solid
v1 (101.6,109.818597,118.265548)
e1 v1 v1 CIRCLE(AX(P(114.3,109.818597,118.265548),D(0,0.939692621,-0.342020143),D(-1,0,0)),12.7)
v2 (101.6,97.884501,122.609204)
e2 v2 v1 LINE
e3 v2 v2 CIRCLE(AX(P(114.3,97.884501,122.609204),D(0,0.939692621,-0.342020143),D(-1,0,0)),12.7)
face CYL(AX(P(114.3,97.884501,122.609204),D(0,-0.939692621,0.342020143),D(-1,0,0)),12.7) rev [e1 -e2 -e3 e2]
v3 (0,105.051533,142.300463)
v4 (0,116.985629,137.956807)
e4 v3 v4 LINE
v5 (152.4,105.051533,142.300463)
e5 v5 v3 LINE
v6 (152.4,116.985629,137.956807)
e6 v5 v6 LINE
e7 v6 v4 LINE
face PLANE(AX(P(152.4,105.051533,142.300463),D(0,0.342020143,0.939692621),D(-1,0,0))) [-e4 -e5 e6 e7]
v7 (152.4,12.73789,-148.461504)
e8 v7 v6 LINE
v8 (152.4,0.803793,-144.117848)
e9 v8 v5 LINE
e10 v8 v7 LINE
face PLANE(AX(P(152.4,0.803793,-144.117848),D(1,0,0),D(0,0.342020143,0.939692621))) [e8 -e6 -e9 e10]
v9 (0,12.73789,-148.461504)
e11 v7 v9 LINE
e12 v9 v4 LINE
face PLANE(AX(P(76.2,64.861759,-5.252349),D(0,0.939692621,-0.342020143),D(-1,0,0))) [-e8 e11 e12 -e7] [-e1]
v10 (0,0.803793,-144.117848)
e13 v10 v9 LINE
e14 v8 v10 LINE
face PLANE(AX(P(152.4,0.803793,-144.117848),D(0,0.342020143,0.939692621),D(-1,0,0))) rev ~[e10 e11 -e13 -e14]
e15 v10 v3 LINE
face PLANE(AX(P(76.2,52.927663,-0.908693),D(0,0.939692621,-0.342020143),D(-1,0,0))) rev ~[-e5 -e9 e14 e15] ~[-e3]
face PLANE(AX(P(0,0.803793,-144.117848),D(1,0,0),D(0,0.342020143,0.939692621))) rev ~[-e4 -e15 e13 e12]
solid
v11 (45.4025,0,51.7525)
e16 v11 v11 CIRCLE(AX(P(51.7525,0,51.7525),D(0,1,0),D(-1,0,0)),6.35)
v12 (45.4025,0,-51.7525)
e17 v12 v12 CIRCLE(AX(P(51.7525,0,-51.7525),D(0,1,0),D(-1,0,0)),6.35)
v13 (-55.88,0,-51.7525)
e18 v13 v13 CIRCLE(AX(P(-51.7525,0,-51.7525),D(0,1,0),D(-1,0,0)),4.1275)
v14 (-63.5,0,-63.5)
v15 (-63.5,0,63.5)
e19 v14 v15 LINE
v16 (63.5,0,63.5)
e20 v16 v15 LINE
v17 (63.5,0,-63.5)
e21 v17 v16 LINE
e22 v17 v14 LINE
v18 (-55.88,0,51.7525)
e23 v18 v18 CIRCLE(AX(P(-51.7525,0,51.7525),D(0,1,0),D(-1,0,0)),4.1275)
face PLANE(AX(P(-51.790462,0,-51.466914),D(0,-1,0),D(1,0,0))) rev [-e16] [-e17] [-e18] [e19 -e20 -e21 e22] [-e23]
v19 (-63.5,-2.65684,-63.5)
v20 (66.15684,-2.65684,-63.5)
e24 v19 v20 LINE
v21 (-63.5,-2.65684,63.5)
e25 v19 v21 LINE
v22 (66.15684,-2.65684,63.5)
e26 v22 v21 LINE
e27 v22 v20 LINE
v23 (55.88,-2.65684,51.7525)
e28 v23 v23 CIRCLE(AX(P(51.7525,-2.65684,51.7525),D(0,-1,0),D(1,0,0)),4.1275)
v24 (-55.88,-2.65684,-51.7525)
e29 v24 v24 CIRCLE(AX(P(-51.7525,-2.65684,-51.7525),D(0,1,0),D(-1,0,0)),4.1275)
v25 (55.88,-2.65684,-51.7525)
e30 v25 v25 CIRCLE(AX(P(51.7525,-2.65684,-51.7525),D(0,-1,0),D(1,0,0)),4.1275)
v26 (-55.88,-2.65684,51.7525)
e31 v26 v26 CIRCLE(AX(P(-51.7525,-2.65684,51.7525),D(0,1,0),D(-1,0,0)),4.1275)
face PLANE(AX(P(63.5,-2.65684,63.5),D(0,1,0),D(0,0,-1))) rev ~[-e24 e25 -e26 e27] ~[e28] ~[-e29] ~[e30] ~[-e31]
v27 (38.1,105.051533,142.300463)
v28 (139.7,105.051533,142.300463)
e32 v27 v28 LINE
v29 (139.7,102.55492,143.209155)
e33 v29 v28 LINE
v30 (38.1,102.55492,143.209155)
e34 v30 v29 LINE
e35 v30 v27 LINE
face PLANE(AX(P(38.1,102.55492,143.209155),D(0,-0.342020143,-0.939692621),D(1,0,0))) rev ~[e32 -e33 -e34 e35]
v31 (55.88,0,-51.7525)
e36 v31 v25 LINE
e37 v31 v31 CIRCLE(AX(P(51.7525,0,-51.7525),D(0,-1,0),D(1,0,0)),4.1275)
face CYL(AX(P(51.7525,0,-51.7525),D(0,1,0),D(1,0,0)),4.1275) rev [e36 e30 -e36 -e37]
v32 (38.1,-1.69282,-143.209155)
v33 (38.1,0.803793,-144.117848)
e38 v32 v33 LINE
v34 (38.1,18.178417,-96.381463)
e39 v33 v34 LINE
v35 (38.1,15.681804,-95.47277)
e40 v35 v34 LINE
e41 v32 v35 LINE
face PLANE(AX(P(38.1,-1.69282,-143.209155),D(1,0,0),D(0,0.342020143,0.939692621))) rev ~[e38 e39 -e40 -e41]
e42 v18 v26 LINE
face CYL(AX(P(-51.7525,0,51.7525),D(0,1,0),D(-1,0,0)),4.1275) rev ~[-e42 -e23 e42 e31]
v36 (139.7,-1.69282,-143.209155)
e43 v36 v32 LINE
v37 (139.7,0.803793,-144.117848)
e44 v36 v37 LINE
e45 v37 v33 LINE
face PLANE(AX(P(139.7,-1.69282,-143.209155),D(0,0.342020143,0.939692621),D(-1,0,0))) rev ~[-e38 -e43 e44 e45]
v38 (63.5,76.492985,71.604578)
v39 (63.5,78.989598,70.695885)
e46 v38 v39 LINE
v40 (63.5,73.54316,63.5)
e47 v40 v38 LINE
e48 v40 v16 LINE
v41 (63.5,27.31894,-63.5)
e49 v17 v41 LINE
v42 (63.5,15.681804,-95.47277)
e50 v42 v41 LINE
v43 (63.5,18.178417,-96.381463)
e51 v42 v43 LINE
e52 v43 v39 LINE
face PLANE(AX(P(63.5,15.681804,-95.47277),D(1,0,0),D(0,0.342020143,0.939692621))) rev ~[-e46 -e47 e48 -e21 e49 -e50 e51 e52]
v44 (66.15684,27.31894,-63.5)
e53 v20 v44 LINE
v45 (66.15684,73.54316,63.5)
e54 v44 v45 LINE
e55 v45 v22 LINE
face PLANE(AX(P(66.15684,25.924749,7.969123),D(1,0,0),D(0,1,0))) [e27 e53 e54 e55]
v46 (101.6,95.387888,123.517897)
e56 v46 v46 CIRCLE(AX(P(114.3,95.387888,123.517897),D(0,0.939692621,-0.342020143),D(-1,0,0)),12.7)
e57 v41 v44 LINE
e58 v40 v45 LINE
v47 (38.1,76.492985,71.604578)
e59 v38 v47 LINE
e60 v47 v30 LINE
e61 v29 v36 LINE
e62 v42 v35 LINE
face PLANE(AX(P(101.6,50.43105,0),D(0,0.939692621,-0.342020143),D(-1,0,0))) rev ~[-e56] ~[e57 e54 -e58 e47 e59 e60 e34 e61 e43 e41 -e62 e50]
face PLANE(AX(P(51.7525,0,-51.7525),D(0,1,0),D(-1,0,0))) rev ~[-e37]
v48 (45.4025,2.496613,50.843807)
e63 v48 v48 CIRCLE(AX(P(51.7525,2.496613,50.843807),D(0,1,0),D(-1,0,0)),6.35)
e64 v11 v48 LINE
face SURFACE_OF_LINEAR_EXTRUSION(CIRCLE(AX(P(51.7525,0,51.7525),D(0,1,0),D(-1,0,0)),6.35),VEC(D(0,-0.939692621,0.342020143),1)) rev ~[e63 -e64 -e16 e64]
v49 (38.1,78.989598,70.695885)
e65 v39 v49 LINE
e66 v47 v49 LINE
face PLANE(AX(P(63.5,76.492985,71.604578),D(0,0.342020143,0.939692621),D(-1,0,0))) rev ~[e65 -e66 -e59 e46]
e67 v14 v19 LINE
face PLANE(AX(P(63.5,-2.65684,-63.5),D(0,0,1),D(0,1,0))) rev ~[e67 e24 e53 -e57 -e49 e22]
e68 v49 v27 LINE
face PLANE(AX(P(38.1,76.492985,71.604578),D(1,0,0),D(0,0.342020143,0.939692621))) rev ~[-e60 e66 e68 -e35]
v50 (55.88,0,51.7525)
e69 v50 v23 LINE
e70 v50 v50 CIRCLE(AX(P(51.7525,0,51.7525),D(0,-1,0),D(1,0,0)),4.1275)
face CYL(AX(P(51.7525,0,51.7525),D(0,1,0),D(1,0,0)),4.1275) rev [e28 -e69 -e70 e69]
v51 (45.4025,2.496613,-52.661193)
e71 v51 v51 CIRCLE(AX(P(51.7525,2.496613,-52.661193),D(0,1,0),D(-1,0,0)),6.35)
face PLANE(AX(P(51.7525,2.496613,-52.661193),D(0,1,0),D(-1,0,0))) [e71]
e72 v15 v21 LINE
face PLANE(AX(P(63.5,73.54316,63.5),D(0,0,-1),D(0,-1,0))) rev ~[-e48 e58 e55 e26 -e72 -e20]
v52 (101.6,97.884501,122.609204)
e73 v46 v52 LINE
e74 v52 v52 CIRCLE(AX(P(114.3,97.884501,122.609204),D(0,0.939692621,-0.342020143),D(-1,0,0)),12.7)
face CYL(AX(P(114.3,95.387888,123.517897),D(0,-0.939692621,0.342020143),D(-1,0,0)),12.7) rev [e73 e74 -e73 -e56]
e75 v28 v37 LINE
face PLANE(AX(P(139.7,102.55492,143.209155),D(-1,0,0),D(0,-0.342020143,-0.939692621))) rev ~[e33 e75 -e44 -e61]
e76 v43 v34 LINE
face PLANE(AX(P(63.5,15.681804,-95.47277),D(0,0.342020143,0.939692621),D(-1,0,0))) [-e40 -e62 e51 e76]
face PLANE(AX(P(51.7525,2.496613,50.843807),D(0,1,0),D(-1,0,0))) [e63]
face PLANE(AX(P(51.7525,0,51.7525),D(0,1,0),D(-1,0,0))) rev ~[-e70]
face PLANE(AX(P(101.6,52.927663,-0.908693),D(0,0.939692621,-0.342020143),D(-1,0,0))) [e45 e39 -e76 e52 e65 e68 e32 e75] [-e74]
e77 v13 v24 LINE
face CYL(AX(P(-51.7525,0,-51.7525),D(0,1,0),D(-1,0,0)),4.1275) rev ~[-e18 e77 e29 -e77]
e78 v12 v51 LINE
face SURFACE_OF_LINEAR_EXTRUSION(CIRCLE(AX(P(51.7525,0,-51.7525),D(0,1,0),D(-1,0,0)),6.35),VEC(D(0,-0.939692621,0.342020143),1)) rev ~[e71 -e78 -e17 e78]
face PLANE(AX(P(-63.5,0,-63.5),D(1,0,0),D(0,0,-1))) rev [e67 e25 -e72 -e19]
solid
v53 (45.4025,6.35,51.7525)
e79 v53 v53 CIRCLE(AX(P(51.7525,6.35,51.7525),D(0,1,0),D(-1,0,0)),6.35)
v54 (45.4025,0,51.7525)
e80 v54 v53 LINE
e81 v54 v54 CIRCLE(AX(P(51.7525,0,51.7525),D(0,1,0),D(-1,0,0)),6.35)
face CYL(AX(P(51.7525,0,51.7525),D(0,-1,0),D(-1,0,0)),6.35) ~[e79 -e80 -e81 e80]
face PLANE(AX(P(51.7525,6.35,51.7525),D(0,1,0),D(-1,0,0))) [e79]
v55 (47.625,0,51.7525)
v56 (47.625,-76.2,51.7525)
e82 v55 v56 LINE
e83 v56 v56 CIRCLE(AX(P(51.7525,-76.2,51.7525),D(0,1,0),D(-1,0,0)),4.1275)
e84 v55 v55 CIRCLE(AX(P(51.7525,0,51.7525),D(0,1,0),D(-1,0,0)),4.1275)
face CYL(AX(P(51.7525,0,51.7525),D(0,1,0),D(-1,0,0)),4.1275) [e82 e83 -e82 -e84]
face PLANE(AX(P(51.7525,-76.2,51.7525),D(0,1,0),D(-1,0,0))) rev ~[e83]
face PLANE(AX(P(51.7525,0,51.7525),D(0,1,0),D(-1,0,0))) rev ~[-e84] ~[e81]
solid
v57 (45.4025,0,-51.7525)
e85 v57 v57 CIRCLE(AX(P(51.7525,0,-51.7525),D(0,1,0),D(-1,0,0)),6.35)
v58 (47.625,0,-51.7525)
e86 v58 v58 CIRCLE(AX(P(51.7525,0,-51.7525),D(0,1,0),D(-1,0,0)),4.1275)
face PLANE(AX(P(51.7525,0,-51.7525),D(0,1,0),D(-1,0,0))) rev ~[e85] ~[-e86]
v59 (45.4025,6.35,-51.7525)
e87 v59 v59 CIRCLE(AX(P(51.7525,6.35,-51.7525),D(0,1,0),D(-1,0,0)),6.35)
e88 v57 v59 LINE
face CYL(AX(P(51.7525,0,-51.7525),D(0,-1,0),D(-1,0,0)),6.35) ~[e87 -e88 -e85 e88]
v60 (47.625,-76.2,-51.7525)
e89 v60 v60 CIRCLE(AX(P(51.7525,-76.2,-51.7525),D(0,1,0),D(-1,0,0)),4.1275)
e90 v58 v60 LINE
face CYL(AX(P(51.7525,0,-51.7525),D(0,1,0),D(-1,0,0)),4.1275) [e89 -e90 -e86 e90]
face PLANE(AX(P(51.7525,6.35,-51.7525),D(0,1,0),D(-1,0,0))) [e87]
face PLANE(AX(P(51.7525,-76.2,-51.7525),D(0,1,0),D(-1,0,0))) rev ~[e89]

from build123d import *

# Parameters (mm, degrees)
F0_R      = 4.1275
F1_DEPTH  = 2.65684
F4_DEPTH  = 2.65684
F5_R      = 6.35
F5_R_2    = 4.1275
F6_DEPTH  = 6.35
F7_DEPTH  = 76.2
F8_R      = 12.7
F8_W      = 25.4
F8_H      = 76.2
F8_H_2    = 50.8
F9_DEPTH  = 2.65684
F10_W     = 152.4
F10_H     = 304.8
F10_R     = 12.7
F11_DEPTH = 12.7


with BuildPart() as f1:
    # F0 (on Front) → F1 (new body)
    with BuildSketch(Plane.XZ):
        with BuildLine():
            Line((47.625, -47.625), (46.9269177812, -47.625))
            ThreePointArc((46.9269177812, -47.625), (49.5524939874, -57.7092166749), (58.1025, -51.7525))
            ThreePointArc((58.1025, -51.7525), (54.4088955842, -45.9848260754), (47.625, -46.9269177812))
            Line((47.625, -46.9269177812), (47.625, -47.625))
        make_face()
        with Locations((51.7525, -51.7525)):
            Circle(F0_R, mode=Mode.SUBTRACT)
        with BuildLine():
            Line((46.9269177812, 47.625), (0, 47.625))
            Line((0, 47.625), (0, -47.625))
            Line((0, -47.625), (46.9269177812, -47.625))
            ThreePointArc((46.9269177812, -47.625), (47.2623719395, -47.2623719395), (47.625, -46.9269177812))
            Line((47.625, -46.9269177812), (47.625, 46.9269177812))
            ThreePointArc((47.625, 46.9269177812), (47.2623719395, 47.2623719395), (46.9269177812, 47.625))
        make_face()
        with BuildLine():
            Line((63.5, 63.5), (0, 63.5))
            Line((0, 63.5), (0, 47.625))
            Line((0, 47.625), (46.9269177812, 47.625))
            ThreePointArc((46.9269177812, 47.625), (49.5524939874, 57.7092166749), (58.1025, 51.7525))
            ThreePointArc((58.1025, 51.7525), (54.4088955842, 45.9848260754), (47.625, 46.9269177812))
            Line((47.625, 46.9269177812), (47.625, -46.9269177812))
            ThreePointArc((47.625, -46.9269177812), (54.4088955842, -45.9848260754), (58.1025, -51.7525))
            ThreePointArc((58.1025, -51.7525), (49.5524939874, -57.7092166749), (46.9269177812, -47.625))
            Line((46.9269177812, -47.625), (0, -47.625))
            Line((0, -47.625), (0, -63.5))
            Line((0, -63.5), (63.5, -63.5))
            Line((63.5, -63.5), (63.5, 63.5))
        make_face()
        with BuildLine():
            ThreePointArc((58.1025, 51.7525), (49.5524939874, 57.7092166749), (46.9269177812, 47.625))
            Line((46.9269177812, 47.625), (47.625, 47.625))
            Line((47.625, 47.625), (47.625, 46.9269177812))
            ThreePointArc((47.625, 46.9269177812), (54.4088955842, 45.9848260754), (58.1025, 51.7525))
        make_face()
        with Locations((51.7525, 51.7525)):
            Circle(F0_R, mode=Mode.SUBTRACT)
        with BuildLine():
            Line((47.625, 47.625), (46.9269177812, 47.625))
            ThreePointArc((46.9269177812, 47.625), (47.2623719395, 47.2623719395), (47.625, 46.9269177812))
            Line((47.625, 46.9269177812), (47.625, 47.625))
        make_face()
        with BuildLine():
            ThreePointArc((47.625, -46.9269177812), (47.2623719395, -47.2623719395), (46.9269177812, -47.625))
            Line((46.9269177812, -47.625), (47.625, -47.625))
            Line((47.625, -47.625), (47.625, -46.9269177812))
        make_face()
    extrude(amount=F1_DEPTH)

    # F2: F1 across plane


with BuildPart() as f1_1:
    add(f1.part)
    add(f1.part.mirror(Plane.YZ))

    # F3 (on face) → F4 (join)
    with BuildSketch(Plane.YZ.offset(63.5)):
        Polygon((-2.65684, 63.5), (-2.65684, -63.5), (27.3189402482, -63.5), (73.54316, 63.5), align=None)
    extrude(amount=F4_DEPTH)

    # F8 (on face) + F5 (on face) → F9 (join)
    with BuildSketch(Plane(origin=(0, 44.5317379162, -16.2082270816), x_dir=(-1, 0, 0), z_dir=(0, 0.9396926208, -0.3420201433))):
        Polygon((-63.5, 169.6484349915), (-139.7, 169.6484349915), (-139.7, -135.1515650085), (-63.5, -135.1515650085), (-63.5, -84.3515650085), (-63.5, 93.4484349915), align=None)
        with Locations((-114.3, 148.6934349915)):
            Circle(F8_R, mode=Mode.SUBTRACT)
        with Locations((-50.8, 131.5484349915)):
            Rectangle(F8_W, F8_H)
        with Locations((-50.8, -109.7515650085)):
            Rectangle(F8_W, F8_H_2)
    with BuildSketch(Plane(origin=(0, 0, 0), x_dir=(-1, 0, 0), z_dir=(0, 1, 0))):
        with Locations((-51.7525, 51.7525)):
            Circle(F5_R)
        with Locations((-51.7525, -51.7525)):
            Circle(F5_R)
    extrude(amount=F9_DEPTH, dir=(0, 0.9396926208, -0.3420201433))


with BuildPart() as f6:
    # F5 (on face) → F6 (new body)
    with BuildSketch(Plane(origin=(0, 0, 0), x_dir=(-1, 0, 0), z_dir=(0, 1, 0))):
        with Locations((-51.7525, 51.7525)):
            Circle(F5_R)
        with Locations((-51.7525, 51.7525)):
            Circle(F5_R_2, mode=Mode.SUBTRACT)
        with Locations((-51.7525, 51.7525)):
            Circle(F5_R_2)
    extrude(amount=F6_DEPTH)

    # F5 (on face) → F7, piece 2 (join)
    with BuildSketch(Plane(origin=(0, 0, 0), x_dir=(-1, 0, 0), z_dir=(0, 1, 0))):
        with Locations((-51.7525, 51.7525)):
            Circle(F5_R_2)
    extrude(amount=-F7_DEPTH)


with BuildPart() as f6b:
    # F5 (on face) → F6, piece 2 (new body)
    with BuildSketch(Plane(origin=(0, 0, 0), x_dir=(-1, 0, 0), z_dir=(0, 1, 0))):
        with Locations((-51.7525, -51.7525)):
            Circle(F5_R)
        with Locations((-51.7525, -51.7525)):
            Circle(F5_R_2, mode=Mode.SUBTRACT)
        with Locations((-51.7525, -51.7525)):
            Circle(F5_R_2)
    extrude(amount=F6_DEPTH)

    # F5 (on face) → F7 (join)
    with BuildSketch(Plane(origin=(0, 0, 0), x_dir=(-1, 0, 0), z_dir=(0, 1, 0))):
        with Locations((-51.7525, -51.7525)):
            Circle(F5_R_2)
    extrude(amount=-F7_DEPTH)


with BuildPart() as f11:
    # F10 (on face) → F11 (new body)
    with BuildSketch(Plane(origin=(0, 47.0283508588, -17.1169198792), x_dir=(-1, 0, 0), z_dir=(0, 0.9396926208, -0.3420201433))):
        with Locations((-76.2, 17.2484349915)):
            Rectangle(F10_W, F10_H)
        with Locations((-114.3, 148.6934349915)):
            Circle(F10_R, mode=Mode.SUBTRACT)
    extrude(amount=F11_DEPTH)


solid = Compound([f1_1.part, f6.part, f6b.part, f11.part])
